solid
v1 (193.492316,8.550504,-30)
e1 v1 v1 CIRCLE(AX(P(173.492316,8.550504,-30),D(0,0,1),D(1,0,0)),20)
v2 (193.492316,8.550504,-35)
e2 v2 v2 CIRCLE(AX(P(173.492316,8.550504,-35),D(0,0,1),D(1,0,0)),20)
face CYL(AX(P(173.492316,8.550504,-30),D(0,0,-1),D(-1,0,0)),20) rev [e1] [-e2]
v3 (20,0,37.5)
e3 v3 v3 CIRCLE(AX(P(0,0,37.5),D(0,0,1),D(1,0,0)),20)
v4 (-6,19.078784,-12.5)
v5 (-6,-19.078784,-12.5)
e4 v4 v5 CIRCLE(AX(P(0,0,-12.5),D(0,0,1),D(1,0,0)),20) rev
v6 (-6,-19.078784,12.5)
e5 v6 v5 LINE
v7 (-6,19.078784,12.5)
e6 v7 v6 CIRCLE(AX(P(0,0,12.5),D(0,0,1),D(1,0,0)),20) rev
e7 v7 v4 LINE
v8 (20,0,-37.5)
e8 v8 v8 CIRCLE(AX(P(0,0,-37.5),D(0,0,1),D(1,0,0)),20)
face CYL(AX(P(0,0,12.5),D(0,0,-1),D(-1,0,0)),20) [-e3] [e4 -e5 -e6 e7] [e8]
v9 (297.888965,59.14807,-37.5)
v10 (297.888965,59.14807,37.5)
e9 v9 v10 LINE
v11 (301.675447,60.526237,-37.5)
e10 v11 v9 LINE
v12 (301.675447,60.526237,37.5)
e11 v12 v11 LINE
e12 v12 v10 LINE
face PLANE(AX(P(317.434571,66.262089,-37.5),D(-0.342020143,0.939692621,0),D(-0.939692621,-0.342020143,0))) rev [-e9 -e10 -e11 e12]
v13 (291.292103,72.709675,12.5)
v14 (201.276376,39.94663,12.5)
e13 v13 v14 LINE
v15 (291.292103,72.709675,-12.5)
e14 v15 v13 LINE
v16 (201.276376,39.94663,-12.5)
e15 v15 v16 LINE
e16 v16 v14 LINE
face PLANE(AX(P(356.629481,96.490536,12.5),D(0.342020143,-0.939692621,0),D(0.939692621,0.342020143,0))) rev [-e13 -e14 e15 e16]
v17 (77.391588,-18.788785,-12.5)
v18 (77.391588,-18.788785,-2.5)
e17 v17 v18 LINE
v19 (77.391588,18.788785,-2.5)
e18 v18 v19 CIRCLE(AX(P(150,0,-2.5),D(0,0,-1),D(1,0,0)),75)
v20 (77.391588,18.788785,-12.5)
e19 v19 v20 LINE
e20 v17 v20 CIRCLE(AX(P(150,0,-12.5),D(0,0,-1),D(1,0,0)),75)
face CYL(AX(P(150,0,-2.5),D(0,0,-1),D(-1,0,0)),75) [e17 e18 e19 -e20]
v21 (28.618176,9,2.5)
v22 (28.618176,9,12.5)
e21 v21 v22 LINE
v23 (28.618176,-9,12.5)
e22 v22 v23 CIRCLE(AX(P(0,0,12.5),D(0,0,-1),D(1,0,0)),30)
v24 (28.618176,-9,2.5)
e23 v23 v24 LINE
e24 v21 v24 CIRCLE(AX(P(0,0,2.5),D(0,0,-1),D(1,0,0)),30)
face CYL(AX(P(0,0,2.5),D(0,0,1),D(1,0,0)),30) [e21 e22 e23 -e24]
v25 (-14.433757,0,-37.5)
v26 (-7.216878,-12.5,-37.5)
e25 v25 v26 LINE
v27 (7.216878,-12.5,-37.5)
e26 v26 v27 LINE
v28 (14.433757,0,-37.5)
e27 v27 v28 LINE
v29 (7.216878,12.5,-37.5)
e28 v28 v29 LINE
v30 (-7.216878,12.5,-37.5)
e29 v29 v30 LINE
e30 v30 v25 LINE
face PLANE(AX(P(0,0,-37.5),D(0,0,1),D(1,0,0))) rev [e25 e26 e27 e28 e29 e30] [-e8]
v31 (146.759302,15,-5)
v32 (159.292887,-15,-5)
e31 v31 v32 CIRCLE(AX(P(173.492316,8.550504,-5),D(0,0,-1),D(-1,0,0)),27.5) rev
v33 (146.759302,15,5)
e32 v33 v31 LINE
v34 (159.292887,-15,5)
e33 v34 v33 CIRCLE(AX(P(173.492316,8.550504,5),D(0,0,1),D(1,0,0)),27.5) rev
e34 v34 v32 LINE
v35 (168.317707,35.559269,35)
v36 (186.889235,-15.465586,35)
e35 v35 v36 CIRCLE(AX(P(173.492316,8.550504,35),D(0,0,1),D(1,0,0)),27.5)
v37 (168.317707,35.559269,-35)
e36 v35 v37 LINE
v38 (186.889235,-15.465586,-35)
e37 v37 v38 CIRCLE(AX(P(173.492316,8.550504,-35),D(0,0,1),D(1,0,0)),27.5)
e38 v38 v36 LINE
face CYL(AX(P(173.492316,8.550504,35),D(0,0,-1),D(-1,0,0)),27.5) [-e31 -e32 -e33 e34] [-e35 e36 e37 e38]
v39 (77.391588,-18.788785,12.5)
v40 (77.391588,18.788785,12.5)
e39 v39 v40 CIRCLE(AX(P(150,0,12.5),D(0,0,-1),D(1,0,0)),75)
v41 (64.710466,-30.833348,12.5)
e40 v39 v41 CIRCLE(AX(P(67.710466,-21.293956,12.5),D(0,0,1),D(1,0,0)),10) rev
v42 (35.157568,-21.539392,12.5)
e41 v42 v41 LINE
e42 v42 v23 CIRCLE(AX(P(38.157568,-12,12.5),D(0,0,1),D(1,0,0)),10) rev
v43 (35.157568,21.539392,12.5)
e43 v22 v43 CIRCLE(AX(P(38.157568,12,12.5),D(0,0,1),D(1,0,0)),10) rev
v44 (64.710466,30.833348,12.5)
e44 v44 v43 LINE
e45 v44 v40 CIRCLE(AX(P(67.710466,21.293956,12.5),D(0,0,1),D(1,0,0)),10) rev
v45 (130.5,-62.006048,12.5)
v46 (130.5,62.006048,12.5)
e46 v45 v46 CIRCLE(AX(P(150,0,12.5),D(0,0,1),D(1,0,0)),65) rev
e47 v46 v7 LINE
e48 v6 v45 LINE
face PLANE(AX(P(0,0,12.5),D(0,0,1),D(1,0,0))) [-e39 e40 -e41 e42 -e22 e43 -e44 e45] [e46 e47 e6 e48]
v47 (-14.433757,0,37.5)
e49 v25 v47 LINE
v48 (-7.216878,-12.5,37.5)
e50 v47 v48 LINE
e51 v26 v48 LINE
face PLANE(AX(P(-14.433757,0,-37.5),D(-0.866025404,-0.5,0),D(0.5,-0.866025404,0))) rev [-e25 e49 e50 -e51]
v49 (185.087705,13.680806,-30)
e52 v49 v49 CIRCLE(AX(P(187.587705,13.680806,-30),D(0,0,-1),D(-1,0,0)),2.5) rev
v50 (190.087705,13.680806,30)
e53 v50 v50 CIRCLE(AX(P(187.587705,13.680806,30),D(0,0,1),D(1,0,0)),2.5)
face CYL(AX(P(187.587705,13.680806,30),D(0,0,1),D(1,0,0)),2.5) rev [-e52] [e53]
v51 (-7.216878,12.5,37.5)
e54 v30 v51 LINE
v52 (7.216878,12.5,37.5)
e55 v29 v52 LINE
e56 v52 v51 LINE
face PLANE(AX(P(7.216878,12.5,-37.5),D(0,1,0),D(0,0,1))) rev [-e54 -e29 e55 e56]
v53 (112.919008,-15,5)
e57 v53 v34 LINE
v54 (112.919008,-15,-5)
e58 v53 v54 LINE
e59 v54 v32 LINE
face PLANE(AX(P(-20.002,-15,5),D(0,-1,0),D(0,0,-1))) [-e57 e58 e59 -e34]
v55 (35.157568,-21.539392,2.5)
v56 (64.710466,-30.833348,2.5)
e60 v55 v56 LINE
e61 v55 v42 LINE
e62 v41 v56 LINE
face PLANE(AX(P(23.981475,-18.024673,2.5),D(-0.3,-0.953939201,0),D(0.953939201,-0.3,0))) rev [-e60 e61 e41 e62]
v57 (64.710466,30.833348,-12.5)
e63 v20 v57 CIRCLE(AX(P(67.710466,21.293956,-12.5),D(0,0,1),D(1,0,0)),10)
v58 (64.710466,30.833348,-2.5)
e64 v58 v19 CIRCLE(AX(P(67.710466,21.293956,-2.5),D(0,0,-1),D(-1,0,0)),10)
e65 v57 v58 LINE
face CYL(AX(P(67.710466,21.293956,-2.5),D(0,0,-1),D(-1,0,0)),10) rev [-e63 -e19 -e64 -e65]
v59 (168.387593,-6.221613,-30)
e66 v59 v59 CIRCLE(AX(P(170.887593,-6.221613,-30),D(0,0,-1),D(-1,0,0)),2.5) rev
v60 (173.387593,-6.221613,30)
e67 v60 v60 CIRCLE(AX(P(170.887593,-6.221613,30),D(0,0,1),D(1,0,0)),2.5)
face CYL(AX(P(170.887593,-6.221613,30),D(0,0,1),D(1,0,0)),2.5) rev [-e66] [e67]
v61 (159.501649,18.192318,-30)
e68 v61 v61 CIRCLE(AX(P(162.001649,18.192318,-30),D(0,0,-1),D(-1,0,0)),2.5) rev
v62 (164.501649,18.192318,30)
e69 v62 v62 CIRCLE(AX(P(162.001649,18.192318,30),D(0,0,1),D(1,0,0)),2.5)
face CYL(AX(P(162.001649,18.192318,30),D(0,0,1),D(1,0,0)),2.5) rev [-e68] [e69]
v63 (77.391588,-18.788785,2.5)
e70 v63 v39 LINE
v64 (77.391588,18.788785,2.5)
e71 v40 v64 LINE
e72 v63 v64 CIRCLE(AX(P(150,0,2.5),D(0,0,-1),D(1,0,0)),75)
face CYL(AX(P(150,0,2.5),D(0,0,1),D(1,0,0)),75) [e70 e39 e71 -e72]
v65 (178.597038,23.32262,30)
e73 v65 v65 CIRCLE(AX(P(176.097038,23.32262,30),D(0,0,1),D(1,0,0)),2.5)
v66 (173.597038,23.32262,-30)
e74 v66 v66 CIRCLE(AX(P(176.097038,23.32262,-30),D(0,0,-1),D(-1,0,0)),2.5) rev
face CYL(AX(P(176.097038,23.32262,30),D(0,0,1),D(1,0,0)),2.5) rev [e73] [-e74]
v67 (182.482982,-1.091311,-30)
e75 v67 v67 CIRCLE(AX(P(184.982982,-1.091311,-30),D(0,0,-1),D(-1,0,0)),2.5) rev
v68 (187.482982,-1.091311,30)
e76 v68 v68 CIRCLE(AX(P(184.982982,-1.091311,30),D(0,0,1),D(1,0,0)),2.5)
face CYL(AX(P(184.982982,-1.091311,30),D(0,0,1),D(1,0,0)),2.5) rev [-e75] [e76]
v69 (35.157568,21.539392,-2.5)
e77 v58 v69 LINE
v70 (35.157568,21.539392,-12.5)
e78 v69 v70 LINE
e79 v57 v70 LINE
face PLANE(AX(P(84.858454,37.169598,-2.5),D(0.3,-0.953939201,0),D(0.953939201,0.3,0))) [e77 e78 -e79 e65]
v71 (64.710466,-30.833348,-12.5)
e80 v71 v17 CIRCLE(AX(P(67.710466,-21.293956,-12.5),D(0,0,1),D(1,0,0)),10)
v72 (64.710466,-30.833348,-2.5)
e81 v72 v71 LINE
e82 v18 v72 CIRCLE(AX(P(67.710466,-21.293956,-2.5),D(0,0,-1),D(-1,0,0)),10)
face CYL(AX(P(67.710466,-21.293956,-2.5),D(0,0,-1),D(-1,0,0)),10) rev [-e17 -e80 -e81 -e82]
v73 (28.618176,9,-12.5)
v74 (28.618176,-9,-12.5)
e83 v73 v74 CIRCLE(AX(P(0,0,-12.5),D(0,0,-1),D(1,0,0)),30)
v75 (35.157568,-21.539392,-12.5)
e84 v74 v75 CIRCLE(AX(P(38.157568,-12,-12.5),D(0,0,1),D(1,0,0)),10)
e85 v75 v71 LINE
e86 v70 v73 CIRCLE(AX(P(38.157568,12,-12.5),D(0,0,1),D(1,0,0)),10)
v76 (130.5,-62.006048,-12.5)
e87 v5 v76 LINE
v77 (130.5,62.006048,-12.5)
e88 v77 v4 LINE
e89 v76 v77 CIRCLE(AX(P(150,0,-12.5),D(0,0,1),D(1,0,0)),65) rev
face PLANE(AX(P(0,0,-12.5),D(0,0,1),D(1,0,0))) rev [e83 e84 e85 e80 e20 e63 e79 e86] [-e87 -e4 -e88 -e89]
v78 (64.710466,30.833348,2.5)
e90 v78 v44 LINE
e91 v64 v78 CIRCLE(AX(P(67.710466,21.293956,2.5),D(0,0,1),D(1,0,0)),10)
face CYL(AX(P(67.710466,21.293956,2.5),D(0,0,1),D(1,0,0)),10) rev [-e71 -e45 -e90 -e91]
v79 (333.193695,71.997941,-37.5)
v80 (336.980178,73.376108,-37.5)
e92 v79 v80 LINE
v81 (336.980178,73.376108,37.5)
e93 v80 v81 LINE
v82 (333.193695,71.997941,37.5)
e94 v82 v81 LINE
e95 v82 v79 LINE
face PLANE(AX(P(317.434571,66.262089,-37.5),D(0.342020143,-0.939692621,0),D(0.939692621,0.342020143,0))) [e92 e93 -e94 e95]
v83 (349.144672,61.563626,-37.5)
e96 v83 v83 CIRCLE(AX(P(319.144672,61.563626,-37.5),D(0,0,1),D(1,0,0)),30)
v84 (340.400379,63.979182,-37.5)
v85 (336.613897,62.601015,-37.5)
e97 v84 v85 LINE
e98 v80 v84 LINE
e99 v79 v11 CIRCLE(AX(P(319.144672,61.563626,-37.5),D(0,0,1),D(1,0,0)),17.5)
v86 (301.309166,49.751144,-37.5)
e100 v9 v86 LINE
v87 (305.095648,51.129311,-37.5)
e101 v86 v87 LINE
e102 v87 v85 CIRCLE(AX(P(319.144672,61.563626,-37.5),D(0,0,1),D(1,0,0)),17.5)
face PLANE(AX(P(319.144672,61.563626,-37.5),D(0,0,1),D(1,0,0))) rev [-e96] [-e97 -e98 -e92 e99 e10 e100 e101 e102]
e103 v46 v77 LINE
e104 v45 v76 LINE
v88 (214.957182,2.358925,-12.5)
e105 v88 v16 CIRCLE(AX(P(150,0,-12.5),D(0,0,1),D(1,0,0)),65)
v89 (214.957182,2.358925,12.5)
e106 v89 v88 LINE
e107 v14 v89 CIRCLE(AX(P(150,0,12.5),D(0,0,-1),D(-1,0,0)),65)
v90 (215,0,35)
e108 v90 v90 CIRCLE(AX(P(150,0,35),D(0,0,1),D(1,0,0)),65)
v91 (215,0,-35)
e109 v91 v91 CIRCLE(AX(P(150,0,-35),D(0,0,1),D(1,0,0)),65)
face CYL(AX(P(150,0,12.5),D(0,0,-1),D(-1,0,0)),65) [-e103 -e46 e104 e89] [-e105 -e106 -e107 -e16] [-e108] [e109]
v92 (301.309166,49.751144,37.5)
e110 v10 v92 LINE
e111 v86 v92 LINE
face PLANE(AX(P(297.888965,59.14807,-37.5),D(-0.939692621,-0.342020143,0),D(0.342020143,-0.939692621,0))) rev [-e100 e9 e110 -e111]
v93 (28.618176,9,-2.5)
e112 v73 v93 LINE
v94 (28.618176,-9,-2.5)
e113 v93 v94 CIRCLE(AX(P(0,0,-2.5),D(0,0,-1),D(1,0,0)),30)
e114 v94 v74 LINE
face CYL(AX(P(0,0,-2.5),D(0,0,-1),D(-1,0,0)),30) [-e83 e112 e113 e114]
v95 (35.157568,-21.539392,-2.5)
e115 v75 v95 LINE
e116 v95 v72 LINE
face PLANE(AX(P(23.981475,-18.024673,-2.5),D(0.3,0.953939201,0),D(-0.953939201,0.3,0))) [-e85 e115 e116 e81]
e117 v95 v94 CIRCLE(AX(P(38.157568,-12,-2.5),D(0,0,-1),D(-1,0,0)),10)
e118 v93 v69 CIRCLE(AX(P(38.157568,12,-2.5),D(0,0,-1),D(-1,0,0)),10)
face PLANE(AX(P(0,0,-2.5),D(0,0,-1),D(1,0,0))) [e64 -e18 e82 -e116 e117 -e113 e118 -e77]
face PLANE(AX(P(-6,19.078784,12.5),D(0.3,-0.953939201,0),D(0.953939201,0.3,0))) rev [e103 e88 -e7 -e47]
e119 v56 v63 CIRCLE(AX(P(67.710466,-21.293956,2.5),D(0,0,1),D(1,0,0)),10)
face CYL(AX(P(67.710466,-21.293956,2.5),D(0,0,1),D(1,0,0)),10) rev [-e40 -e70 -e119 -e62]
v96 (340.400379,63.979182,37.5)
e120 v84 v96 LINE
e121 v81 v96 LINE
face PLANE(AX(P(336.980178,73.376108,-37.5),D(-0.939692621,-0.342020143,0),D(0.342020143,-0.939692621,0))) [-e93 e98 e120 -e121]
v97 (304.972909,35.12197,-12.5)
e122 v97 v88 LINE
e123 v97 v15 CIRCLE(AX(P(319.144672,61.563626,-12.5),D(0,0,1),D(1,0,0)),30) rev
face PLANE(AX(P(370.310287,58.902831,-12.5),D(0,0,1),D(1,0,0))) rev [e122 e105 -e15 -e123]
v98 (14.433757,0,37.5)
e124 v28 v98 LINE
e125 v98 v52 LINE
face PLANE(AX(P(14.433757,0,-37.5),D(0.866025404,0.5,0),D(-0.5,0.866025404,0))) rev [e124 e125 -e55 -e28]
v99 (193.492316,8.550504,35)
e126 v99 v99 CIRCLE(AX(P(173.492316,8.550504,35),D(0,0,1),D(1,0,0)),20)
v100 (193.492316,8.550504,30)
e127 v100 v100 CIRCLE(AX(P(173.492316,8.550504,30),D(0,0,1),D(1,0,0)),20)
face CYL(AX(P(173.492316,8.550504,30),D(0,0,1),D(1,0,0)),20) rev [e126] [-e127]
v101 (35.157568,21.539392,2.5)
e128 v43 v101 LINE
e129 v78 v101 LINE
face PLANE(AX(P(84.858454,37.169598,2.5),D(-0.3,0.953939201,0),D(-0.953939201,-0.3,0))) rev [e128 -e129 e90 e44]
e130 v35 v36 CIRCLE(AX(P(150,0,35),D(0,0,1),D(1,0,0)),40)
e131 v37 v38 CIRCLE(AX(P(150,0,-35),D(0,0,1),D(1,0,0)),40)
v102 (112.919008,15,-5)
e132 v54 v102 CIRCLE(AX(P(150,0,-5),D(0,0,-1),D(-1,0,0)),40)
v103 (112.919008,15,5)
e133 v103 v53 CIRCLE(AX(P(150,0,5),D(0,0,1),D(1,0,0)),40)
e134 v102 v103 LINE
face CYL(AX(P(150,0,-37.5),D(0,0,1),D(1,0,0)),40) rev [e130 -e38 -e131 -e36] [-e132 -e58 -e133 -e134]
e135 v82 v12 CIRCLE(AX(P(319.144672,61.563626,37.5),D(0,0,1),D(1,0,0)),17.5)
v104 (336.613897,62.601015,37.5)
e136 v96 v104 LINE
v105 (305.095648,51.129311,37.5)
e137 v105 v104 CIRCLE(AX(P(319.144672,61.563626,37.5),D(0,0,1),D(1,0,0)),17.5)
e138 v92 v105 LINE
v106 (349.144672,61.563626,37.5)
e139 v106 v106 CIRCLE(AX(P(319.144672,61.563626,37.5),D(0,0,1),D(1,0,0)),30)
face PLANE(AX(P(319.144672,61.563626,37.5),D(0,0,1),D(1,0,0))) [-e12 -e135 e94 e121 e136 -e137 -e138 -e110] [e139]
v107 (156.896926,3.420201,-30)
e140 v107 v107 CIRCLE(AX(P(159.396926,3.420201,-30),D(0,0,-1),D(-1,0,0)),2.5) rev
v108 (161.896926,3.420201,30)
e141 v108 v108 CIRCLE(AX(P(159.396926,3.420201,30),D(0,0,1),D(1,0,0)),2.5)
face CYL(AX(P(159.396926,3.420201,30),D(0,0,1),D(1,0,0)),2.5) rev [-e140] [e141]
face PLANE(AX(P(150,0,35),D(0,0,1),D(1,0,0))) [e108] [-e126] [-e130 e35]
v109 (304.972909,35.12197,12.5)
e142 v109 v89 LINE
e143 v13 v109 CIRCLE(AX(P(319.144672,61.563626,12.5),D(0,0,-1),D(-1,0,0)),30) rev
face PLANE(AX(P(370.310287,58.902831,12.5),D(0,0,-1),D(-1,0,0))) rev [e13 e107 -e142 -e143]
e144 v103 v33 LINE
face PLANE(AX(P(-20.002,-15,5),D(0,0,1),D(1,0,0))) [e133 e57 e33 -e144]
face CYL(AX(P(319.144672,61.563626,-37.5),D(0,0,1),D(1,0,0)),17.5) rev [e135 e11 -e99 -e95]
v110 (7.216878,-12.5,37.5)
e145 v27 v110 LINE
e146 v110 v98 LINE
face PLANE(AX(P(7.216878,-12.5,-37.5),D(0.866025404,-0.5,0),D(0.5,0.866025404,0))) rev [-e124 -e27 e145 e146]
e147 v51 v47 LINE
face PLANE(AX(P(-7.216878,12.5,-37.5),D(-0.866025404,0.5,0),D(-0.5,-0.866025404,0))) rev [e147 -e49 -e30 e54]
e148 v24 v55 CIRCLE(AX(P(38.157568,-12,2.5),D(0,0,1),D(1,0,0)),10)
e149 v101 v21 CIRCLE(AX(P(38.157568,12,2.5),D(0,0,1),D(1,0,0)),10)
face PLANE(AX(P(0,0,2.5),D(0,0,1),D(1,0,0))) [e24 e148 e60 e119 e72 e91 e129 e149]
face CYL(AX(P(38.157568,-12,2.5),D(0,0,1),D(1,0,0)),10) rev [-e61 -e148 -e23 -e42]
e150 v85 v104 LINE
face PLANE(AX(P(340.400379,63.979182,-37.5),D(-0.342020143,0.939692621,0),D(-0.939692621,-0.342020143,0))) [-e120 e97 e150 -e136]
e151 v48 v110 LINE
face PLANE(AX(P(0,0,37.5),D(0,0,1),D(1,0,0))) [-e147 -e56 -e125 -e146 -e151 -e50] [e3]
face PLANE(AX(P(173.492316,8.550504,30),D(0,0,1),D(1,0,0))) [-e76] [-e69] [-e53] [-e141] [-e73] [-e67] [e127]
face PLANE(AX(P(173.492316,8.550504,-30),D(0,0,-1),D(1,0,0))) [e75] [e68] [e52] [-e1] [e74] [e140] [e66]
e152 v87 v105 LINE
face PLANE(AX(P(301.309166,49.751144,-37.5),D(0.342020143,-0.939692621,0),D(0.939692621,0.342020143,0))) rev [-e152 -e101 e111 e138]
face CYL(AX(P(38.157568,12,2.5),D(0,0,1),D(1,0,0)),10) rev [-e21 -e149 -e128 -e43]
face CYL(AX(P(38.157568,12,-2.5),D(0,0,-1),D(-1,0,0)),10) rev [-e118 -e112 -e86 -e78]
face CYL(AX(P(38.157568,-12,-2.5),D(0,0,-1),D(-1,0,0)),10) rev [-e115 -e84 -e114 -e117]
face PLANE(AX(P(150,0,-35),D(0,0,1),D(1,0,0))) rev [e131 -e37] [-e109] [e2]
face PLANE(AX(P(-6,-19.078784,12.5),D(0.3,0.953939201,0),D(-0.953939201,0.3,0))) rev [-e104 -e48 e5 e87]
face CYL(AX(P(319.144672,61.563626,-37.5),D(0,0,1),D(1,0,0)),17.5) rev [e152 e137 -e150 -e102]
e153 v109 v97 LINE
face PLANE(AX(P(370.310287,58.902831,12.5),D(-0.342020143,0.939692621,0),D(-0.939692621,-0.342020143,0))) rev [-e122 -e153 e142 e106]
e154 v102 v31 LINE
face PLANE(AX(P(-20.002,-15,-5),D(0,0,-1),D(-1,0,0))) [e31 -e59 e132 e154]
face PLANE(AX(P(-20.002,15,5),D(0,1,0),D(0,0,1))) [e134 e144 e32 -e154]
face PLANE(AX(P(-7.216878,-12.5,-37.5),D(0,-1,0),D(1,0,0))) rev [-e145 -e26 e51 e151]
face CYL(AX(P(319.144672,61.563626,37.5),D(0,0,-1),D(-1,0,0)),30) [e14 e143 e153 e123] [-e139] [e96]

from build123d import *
from build123d.topology import SkipClean

# Parameters (mm, degrees)
LEFT_ARM_DEPTH                = 12.5
SKETCH2_R                     = 20
LEFT_BOSS_DEPTH               = 37.5
LEFT_HEX_DEPTH                = 237.801604724
LEFT_HEX_DEPTH_BACK           = 237.801604724
SKETCH3_R                     = 65
CENTRE_BOSS_DEPTH             = 35
SKETCH5_W                     = 25
SKETCH5_H                     = 40
RIGHT_ARM_DEPTH               = 180
SKETCH7_R                     = 30
RIGHT_BOSS_DEPTH              = 37.5
SKETCH8_R                     = 17.5
RIGHT_BOSS_HOLE_DEPTH         = 369.660954503
SKETCH9_R                     = 40
CENTRE_HOLE_DEPTH             = 369.160494044
SKETCH10_R                    = 27.5
CENTRE_BLOB_DEPTH             = 35
CENTRE_BEAM_REACH             = 224.371
SKETCH11_W                    = 10
SKETCH11_H                    = 30
CENTRE_BEAM_DIRECTION_2_REACH = 224.371
SKETCH12_R                    = 20
CUT_EXTRUDE4_DEPTH            = 5
M6X1_0_TAPPED_HOLE1_D         = 5
CIRPATTERN1_COUNT             = 6
CUT_OUT_DEPTH                 = 10
FILLET1_R                     = 10
FILLET1_OF_MIRROR2_R          = 10
KEYWAY_DEPTH                  = 363.894129706


with BuildPart() as part:
    # Sketch1 → LEFT_ARM (new, symmetric)
    with BuildSketch(Plane.XY):
        with BuildLine():
            Line((-6, 19.078784028), (130.5, 62.006048092))
            ThreePointArc((130.5, 62.006048092), (215, 0), (130.5, -62.006048092))
            Line((130.5, -62.006048092), (-6, -19.078784028))
            ThreePointArc((-6, -19.078784028), (-20, 0), (-6, 19.078784028))
        make_face()
    extrude(amount=LEFT_ARM_DEPTH, both=True)

    # Sketch2 → LEFT_Boss (add, symmetric)
    with SkipClean():  # the faces are left unmerged after this step: merging them gives an invalid solid
        with BuildSketch(Plane.XY):
            Circle(SKETCH2_R)
        extrude(amount=LEFT_BOSS_DEPTH, both=True)

    # Sketch4 → LEFT_Hex (cut, two sides: drawn at the far end of the back side and taken through both)
    with SkipClean():  # the faces are left unmerged after this step: merging them gives an invalid solid
        with BuildSketch(Plane.XY.offset(37.5).offset(-LEFT_HEX_DEPTH_BACK)):
            Polygon((14.43375673, 0), (7.216878365, 12.5), (-7.216878365, 12.5), (-14.43375673, 0), (-7.216878365, -12.5), (7.216878365, -12.5), align=None)
        extrude(amount=LEFT_HEX_DEPTH + LEFT_HEX_DEPTH_BACK, mode=Mode.SUBTRACT)

    # Sketch3 → CENTRE_Boss (add, symmetric)
    with SkipClean():  # the faces are left unmerged after this step: merging them gives an invalid solid
        with BuildSketch(Plane.XY):
            with Locations((150, 0)):
                Circle(SKETCH3_R)
        extrude(amount=CENTRE_BOSS_DEPTH, both=True)

    # Sketch5 → RIGHT_ARM (add)
    with SkipClean():  # the faces are left unmerged after this step: merging them gives an invalid solid
        with BuildSketch(Plane(origin=(132.453333234, 48.209070726, 0), x_dir=(0, 0, -1), z_dir=(0.9396926207859081, 0.34202014332566943, 0))):
            with Locations((0, -51.303021499)):
                Rectangle(SKETCH5_W, SKETCH5_H)
        extrude(amount=RIGHT_ARM_DEPTH)

    # Sketch7 → RIGHT_Boss (add, symmetric)
    with SkipClean():  # the faces are left unmerged after this step: merging them gives an invalid solid
        with BuildSketch(Plane.XY):
            with Locations((319.144671741, 61.563625799)):
                Circle(SKETCH7_R)
        extrude(amount=RIGHT_BOSS_DEPTH, both=True)
    add(part.part.scale(1), mode=Mode.REPLACE)  # the faces are merged on a copy

    # Sketch8 → RIGHT_Boss_Hole (cut, through all)
    with BuildSketch(Plane.XY.offset(37.5)):
        with Locations((319.144671741, 61.563625799)):
            Circle(SKETCH8_R)
    extrude(amount=-RIGHT_BOSS_HOLE_DEPTH, mode=Mode.SUBTRACT)

    # Sketch9 → CENTRE_Hole (cut, through all)
    with BuildSketch(Plane.XY.offset(35)):
        with Locations((150, 0)):
            Circle(SKETCH9_R)
    extrude(amount=-CENTRE_HOLE_DEPTH, mode=Mode.SUBTRACT)

    # Sketch10 → CENTRE_Blob (add, symmetric)
    with SkipClean():  # the faces are left unmerged after this step: merging them gives an invalid solid
        with BuildSketch(Plane.XY):
            with Locations((173.49231552, 8.550503583)):
                Circle(SKETCH10_R)
        extrude(amount=CENTRE_BLOB_DEPTH, both=True)

    # Sketch11 → CENTRE_Beam (add, up to next)
    with BuildSketch(Plane(origin=(150, 0, 0), x_dir=(0, 0, -1), z_dir=(1, 0, 0)), mode=Mode.PRIVATE) as centre_beam_sk1:
        Rectangle(SKETCH11_W, SKETCH11_H)
    centre_beam_tool1 = extrude(centre_beam_sk1.sketch, amount=CENTRE_BEAM_REACH, mode=Mode.PRIVATE) - part.part
    add(centre_beam_tool1.solids().sort_by_distance((150, 0, 0))[0])

    # Sketch11 → CENTRE_Beam direction 2 (add, up to next)
    with BuildSketch(Plane(origin=(150, 0, 0), x_dir=(0, 0, -1), z_dir=(1, 0, 0)), mode=Mode.PRIVATE) as centre_beam_direction_2_sk1:
        Rectangle(SKETCH11_W, SKETCH11_H)
    centre_beam_direction_2_tool1 = extrude(centre_beam_direction_2_sk1.sketch, amount=-CENTRE_BEAM_DIRECTION_2_REACH, mode=Mode.PRIVATE) - part.part
    add(centre_beam_direction_2_tool1.solids().sort_by_distance((150, 0, 0))[0])

    # Sketch12 → Cut-Extrude4 (cut)
    with BuildSketch(Plane.XY.offset(35)):
        with Locations((173.49231552, 8.550503583)):
            Circle(SKETCH12_R)
    cut_extrude4 = extrude(amount=-CUT_EXTRUDE4_DEPTH, mode=Mode.SUBTRACT)

    # M6x1.0 Tapped Hole1 (through all)
    with Locations(Plane.XY.offset(30)):
        with Locations((159.396926208, 3.420201433)):
            m6x1_0_tapped_hole1 = Hole(M6X1_0_TAPPED_HOLE1_D / 2)

    # CirPattern1: M6x1.0 Tapped Hole1 ×6 about axis
    cirpattern1_axis = Axis((173.49231552, 8.550503583, 0), (0, 0, 1))
    for i in range(1, CIRPATTERN1_COUNT):
        add(m6x1_0_tapped_hole1.rotate(cirpattern1_axis, i * 360 / CIRPATTERN1_COUNT), mode=Mode.SUBTRACT)

    # Mirror1: Cut-Extrude4 across plane
    add(cut_extrude4.mirror(Plane.XY), mode=Mode.SUBTRACT)

    # Sketch15 → Cut_OUT (cut)
    with BuildSketch(Plane.XY.offset(12.5)):
        with BuildLine():
            Line((84.858453972, 37.169597537), (23.981475126, 18.024673388))
            ThreePointArc((23.981475126, 18.024673388), (30, 0), (23.981475126, -18.024673388))
            Line((23.981475126, -18.024673388), (84.858453972, -37.169597537))
            ThreePointArc((84.858453972, -37.169597537), (75, 0), (84.858453972, 37.169597537))
        make_face()
    cut_out = extrude(amount=-CUT_OUT_DEPTH, mode=Mode.SUBTRACT)

    # Fillet1
    fillet1_edges = [part.edges().sort_by_distance(p)[0] for p in [
        (23.981475126, -18.024673388, 7.5),
        (23.981475126, 18.024673388, 7.5),
        (84.858453972, 37.169597537, 7.5),
        (84.858453972, -37.169597537, 7.5),
    ]]
    fillet(fillet1_edges, radius=FILLET1_R)

    # Mirror2: Cut_OUT across plane
    with SkipClean():  # the faces are left unmerged after this step: merging them gives an invalid solid
        add(cut_out.mirror(Plane.XY), mode=Mode.SUBTRACT)

    # Fillet1 of Mirror2
    fillet1_of_mirror2_edges = [part.edges().sort_by_distance(p)[0] for p in [
        (23.981475126, -18.024673388, -7.5),
        (23.981475126, 18.024673388, -7.5),
        (84.858453972, 37.169597537, -7.5),
        (84.858453972, -37.169597537, -7.5),
    ]]
    fillet(fillet1_of_mirror2_edges, radius=FILLET1_OF_MIRROR2_R)

    # Sketch16 → KEYWAY (cut, symmetric)
    with SkipClean():  # the faces are left unmerged after this step: merging them gives an invalid solid
        with BuildSketch(Plane.XY):
            Polygon((320.854772458, 56.865162695), (317.434571025, 66.262088903), (297.888964512, 59.148069921), (301.309165946, 49.751143714), align=None)
        keyway = extrude(amount=KEYWAY_DEPTH, both=True, mode=Mode.SUBTRACT)

    # Mirror3: KEYWAY across plane
    with SkipClean():  # the faces are left unmerged after this step: merging them gives an invalid solid
        add(keyway.mirror(Plane(origin=(301.598004975, 109.772696525, 0), x_dir=(0, 0, 1), z_dir=(0.9396926207859081, 0.34202014332566943, 0))), mode=Mode.SUBTRACT)


solid = part.part
